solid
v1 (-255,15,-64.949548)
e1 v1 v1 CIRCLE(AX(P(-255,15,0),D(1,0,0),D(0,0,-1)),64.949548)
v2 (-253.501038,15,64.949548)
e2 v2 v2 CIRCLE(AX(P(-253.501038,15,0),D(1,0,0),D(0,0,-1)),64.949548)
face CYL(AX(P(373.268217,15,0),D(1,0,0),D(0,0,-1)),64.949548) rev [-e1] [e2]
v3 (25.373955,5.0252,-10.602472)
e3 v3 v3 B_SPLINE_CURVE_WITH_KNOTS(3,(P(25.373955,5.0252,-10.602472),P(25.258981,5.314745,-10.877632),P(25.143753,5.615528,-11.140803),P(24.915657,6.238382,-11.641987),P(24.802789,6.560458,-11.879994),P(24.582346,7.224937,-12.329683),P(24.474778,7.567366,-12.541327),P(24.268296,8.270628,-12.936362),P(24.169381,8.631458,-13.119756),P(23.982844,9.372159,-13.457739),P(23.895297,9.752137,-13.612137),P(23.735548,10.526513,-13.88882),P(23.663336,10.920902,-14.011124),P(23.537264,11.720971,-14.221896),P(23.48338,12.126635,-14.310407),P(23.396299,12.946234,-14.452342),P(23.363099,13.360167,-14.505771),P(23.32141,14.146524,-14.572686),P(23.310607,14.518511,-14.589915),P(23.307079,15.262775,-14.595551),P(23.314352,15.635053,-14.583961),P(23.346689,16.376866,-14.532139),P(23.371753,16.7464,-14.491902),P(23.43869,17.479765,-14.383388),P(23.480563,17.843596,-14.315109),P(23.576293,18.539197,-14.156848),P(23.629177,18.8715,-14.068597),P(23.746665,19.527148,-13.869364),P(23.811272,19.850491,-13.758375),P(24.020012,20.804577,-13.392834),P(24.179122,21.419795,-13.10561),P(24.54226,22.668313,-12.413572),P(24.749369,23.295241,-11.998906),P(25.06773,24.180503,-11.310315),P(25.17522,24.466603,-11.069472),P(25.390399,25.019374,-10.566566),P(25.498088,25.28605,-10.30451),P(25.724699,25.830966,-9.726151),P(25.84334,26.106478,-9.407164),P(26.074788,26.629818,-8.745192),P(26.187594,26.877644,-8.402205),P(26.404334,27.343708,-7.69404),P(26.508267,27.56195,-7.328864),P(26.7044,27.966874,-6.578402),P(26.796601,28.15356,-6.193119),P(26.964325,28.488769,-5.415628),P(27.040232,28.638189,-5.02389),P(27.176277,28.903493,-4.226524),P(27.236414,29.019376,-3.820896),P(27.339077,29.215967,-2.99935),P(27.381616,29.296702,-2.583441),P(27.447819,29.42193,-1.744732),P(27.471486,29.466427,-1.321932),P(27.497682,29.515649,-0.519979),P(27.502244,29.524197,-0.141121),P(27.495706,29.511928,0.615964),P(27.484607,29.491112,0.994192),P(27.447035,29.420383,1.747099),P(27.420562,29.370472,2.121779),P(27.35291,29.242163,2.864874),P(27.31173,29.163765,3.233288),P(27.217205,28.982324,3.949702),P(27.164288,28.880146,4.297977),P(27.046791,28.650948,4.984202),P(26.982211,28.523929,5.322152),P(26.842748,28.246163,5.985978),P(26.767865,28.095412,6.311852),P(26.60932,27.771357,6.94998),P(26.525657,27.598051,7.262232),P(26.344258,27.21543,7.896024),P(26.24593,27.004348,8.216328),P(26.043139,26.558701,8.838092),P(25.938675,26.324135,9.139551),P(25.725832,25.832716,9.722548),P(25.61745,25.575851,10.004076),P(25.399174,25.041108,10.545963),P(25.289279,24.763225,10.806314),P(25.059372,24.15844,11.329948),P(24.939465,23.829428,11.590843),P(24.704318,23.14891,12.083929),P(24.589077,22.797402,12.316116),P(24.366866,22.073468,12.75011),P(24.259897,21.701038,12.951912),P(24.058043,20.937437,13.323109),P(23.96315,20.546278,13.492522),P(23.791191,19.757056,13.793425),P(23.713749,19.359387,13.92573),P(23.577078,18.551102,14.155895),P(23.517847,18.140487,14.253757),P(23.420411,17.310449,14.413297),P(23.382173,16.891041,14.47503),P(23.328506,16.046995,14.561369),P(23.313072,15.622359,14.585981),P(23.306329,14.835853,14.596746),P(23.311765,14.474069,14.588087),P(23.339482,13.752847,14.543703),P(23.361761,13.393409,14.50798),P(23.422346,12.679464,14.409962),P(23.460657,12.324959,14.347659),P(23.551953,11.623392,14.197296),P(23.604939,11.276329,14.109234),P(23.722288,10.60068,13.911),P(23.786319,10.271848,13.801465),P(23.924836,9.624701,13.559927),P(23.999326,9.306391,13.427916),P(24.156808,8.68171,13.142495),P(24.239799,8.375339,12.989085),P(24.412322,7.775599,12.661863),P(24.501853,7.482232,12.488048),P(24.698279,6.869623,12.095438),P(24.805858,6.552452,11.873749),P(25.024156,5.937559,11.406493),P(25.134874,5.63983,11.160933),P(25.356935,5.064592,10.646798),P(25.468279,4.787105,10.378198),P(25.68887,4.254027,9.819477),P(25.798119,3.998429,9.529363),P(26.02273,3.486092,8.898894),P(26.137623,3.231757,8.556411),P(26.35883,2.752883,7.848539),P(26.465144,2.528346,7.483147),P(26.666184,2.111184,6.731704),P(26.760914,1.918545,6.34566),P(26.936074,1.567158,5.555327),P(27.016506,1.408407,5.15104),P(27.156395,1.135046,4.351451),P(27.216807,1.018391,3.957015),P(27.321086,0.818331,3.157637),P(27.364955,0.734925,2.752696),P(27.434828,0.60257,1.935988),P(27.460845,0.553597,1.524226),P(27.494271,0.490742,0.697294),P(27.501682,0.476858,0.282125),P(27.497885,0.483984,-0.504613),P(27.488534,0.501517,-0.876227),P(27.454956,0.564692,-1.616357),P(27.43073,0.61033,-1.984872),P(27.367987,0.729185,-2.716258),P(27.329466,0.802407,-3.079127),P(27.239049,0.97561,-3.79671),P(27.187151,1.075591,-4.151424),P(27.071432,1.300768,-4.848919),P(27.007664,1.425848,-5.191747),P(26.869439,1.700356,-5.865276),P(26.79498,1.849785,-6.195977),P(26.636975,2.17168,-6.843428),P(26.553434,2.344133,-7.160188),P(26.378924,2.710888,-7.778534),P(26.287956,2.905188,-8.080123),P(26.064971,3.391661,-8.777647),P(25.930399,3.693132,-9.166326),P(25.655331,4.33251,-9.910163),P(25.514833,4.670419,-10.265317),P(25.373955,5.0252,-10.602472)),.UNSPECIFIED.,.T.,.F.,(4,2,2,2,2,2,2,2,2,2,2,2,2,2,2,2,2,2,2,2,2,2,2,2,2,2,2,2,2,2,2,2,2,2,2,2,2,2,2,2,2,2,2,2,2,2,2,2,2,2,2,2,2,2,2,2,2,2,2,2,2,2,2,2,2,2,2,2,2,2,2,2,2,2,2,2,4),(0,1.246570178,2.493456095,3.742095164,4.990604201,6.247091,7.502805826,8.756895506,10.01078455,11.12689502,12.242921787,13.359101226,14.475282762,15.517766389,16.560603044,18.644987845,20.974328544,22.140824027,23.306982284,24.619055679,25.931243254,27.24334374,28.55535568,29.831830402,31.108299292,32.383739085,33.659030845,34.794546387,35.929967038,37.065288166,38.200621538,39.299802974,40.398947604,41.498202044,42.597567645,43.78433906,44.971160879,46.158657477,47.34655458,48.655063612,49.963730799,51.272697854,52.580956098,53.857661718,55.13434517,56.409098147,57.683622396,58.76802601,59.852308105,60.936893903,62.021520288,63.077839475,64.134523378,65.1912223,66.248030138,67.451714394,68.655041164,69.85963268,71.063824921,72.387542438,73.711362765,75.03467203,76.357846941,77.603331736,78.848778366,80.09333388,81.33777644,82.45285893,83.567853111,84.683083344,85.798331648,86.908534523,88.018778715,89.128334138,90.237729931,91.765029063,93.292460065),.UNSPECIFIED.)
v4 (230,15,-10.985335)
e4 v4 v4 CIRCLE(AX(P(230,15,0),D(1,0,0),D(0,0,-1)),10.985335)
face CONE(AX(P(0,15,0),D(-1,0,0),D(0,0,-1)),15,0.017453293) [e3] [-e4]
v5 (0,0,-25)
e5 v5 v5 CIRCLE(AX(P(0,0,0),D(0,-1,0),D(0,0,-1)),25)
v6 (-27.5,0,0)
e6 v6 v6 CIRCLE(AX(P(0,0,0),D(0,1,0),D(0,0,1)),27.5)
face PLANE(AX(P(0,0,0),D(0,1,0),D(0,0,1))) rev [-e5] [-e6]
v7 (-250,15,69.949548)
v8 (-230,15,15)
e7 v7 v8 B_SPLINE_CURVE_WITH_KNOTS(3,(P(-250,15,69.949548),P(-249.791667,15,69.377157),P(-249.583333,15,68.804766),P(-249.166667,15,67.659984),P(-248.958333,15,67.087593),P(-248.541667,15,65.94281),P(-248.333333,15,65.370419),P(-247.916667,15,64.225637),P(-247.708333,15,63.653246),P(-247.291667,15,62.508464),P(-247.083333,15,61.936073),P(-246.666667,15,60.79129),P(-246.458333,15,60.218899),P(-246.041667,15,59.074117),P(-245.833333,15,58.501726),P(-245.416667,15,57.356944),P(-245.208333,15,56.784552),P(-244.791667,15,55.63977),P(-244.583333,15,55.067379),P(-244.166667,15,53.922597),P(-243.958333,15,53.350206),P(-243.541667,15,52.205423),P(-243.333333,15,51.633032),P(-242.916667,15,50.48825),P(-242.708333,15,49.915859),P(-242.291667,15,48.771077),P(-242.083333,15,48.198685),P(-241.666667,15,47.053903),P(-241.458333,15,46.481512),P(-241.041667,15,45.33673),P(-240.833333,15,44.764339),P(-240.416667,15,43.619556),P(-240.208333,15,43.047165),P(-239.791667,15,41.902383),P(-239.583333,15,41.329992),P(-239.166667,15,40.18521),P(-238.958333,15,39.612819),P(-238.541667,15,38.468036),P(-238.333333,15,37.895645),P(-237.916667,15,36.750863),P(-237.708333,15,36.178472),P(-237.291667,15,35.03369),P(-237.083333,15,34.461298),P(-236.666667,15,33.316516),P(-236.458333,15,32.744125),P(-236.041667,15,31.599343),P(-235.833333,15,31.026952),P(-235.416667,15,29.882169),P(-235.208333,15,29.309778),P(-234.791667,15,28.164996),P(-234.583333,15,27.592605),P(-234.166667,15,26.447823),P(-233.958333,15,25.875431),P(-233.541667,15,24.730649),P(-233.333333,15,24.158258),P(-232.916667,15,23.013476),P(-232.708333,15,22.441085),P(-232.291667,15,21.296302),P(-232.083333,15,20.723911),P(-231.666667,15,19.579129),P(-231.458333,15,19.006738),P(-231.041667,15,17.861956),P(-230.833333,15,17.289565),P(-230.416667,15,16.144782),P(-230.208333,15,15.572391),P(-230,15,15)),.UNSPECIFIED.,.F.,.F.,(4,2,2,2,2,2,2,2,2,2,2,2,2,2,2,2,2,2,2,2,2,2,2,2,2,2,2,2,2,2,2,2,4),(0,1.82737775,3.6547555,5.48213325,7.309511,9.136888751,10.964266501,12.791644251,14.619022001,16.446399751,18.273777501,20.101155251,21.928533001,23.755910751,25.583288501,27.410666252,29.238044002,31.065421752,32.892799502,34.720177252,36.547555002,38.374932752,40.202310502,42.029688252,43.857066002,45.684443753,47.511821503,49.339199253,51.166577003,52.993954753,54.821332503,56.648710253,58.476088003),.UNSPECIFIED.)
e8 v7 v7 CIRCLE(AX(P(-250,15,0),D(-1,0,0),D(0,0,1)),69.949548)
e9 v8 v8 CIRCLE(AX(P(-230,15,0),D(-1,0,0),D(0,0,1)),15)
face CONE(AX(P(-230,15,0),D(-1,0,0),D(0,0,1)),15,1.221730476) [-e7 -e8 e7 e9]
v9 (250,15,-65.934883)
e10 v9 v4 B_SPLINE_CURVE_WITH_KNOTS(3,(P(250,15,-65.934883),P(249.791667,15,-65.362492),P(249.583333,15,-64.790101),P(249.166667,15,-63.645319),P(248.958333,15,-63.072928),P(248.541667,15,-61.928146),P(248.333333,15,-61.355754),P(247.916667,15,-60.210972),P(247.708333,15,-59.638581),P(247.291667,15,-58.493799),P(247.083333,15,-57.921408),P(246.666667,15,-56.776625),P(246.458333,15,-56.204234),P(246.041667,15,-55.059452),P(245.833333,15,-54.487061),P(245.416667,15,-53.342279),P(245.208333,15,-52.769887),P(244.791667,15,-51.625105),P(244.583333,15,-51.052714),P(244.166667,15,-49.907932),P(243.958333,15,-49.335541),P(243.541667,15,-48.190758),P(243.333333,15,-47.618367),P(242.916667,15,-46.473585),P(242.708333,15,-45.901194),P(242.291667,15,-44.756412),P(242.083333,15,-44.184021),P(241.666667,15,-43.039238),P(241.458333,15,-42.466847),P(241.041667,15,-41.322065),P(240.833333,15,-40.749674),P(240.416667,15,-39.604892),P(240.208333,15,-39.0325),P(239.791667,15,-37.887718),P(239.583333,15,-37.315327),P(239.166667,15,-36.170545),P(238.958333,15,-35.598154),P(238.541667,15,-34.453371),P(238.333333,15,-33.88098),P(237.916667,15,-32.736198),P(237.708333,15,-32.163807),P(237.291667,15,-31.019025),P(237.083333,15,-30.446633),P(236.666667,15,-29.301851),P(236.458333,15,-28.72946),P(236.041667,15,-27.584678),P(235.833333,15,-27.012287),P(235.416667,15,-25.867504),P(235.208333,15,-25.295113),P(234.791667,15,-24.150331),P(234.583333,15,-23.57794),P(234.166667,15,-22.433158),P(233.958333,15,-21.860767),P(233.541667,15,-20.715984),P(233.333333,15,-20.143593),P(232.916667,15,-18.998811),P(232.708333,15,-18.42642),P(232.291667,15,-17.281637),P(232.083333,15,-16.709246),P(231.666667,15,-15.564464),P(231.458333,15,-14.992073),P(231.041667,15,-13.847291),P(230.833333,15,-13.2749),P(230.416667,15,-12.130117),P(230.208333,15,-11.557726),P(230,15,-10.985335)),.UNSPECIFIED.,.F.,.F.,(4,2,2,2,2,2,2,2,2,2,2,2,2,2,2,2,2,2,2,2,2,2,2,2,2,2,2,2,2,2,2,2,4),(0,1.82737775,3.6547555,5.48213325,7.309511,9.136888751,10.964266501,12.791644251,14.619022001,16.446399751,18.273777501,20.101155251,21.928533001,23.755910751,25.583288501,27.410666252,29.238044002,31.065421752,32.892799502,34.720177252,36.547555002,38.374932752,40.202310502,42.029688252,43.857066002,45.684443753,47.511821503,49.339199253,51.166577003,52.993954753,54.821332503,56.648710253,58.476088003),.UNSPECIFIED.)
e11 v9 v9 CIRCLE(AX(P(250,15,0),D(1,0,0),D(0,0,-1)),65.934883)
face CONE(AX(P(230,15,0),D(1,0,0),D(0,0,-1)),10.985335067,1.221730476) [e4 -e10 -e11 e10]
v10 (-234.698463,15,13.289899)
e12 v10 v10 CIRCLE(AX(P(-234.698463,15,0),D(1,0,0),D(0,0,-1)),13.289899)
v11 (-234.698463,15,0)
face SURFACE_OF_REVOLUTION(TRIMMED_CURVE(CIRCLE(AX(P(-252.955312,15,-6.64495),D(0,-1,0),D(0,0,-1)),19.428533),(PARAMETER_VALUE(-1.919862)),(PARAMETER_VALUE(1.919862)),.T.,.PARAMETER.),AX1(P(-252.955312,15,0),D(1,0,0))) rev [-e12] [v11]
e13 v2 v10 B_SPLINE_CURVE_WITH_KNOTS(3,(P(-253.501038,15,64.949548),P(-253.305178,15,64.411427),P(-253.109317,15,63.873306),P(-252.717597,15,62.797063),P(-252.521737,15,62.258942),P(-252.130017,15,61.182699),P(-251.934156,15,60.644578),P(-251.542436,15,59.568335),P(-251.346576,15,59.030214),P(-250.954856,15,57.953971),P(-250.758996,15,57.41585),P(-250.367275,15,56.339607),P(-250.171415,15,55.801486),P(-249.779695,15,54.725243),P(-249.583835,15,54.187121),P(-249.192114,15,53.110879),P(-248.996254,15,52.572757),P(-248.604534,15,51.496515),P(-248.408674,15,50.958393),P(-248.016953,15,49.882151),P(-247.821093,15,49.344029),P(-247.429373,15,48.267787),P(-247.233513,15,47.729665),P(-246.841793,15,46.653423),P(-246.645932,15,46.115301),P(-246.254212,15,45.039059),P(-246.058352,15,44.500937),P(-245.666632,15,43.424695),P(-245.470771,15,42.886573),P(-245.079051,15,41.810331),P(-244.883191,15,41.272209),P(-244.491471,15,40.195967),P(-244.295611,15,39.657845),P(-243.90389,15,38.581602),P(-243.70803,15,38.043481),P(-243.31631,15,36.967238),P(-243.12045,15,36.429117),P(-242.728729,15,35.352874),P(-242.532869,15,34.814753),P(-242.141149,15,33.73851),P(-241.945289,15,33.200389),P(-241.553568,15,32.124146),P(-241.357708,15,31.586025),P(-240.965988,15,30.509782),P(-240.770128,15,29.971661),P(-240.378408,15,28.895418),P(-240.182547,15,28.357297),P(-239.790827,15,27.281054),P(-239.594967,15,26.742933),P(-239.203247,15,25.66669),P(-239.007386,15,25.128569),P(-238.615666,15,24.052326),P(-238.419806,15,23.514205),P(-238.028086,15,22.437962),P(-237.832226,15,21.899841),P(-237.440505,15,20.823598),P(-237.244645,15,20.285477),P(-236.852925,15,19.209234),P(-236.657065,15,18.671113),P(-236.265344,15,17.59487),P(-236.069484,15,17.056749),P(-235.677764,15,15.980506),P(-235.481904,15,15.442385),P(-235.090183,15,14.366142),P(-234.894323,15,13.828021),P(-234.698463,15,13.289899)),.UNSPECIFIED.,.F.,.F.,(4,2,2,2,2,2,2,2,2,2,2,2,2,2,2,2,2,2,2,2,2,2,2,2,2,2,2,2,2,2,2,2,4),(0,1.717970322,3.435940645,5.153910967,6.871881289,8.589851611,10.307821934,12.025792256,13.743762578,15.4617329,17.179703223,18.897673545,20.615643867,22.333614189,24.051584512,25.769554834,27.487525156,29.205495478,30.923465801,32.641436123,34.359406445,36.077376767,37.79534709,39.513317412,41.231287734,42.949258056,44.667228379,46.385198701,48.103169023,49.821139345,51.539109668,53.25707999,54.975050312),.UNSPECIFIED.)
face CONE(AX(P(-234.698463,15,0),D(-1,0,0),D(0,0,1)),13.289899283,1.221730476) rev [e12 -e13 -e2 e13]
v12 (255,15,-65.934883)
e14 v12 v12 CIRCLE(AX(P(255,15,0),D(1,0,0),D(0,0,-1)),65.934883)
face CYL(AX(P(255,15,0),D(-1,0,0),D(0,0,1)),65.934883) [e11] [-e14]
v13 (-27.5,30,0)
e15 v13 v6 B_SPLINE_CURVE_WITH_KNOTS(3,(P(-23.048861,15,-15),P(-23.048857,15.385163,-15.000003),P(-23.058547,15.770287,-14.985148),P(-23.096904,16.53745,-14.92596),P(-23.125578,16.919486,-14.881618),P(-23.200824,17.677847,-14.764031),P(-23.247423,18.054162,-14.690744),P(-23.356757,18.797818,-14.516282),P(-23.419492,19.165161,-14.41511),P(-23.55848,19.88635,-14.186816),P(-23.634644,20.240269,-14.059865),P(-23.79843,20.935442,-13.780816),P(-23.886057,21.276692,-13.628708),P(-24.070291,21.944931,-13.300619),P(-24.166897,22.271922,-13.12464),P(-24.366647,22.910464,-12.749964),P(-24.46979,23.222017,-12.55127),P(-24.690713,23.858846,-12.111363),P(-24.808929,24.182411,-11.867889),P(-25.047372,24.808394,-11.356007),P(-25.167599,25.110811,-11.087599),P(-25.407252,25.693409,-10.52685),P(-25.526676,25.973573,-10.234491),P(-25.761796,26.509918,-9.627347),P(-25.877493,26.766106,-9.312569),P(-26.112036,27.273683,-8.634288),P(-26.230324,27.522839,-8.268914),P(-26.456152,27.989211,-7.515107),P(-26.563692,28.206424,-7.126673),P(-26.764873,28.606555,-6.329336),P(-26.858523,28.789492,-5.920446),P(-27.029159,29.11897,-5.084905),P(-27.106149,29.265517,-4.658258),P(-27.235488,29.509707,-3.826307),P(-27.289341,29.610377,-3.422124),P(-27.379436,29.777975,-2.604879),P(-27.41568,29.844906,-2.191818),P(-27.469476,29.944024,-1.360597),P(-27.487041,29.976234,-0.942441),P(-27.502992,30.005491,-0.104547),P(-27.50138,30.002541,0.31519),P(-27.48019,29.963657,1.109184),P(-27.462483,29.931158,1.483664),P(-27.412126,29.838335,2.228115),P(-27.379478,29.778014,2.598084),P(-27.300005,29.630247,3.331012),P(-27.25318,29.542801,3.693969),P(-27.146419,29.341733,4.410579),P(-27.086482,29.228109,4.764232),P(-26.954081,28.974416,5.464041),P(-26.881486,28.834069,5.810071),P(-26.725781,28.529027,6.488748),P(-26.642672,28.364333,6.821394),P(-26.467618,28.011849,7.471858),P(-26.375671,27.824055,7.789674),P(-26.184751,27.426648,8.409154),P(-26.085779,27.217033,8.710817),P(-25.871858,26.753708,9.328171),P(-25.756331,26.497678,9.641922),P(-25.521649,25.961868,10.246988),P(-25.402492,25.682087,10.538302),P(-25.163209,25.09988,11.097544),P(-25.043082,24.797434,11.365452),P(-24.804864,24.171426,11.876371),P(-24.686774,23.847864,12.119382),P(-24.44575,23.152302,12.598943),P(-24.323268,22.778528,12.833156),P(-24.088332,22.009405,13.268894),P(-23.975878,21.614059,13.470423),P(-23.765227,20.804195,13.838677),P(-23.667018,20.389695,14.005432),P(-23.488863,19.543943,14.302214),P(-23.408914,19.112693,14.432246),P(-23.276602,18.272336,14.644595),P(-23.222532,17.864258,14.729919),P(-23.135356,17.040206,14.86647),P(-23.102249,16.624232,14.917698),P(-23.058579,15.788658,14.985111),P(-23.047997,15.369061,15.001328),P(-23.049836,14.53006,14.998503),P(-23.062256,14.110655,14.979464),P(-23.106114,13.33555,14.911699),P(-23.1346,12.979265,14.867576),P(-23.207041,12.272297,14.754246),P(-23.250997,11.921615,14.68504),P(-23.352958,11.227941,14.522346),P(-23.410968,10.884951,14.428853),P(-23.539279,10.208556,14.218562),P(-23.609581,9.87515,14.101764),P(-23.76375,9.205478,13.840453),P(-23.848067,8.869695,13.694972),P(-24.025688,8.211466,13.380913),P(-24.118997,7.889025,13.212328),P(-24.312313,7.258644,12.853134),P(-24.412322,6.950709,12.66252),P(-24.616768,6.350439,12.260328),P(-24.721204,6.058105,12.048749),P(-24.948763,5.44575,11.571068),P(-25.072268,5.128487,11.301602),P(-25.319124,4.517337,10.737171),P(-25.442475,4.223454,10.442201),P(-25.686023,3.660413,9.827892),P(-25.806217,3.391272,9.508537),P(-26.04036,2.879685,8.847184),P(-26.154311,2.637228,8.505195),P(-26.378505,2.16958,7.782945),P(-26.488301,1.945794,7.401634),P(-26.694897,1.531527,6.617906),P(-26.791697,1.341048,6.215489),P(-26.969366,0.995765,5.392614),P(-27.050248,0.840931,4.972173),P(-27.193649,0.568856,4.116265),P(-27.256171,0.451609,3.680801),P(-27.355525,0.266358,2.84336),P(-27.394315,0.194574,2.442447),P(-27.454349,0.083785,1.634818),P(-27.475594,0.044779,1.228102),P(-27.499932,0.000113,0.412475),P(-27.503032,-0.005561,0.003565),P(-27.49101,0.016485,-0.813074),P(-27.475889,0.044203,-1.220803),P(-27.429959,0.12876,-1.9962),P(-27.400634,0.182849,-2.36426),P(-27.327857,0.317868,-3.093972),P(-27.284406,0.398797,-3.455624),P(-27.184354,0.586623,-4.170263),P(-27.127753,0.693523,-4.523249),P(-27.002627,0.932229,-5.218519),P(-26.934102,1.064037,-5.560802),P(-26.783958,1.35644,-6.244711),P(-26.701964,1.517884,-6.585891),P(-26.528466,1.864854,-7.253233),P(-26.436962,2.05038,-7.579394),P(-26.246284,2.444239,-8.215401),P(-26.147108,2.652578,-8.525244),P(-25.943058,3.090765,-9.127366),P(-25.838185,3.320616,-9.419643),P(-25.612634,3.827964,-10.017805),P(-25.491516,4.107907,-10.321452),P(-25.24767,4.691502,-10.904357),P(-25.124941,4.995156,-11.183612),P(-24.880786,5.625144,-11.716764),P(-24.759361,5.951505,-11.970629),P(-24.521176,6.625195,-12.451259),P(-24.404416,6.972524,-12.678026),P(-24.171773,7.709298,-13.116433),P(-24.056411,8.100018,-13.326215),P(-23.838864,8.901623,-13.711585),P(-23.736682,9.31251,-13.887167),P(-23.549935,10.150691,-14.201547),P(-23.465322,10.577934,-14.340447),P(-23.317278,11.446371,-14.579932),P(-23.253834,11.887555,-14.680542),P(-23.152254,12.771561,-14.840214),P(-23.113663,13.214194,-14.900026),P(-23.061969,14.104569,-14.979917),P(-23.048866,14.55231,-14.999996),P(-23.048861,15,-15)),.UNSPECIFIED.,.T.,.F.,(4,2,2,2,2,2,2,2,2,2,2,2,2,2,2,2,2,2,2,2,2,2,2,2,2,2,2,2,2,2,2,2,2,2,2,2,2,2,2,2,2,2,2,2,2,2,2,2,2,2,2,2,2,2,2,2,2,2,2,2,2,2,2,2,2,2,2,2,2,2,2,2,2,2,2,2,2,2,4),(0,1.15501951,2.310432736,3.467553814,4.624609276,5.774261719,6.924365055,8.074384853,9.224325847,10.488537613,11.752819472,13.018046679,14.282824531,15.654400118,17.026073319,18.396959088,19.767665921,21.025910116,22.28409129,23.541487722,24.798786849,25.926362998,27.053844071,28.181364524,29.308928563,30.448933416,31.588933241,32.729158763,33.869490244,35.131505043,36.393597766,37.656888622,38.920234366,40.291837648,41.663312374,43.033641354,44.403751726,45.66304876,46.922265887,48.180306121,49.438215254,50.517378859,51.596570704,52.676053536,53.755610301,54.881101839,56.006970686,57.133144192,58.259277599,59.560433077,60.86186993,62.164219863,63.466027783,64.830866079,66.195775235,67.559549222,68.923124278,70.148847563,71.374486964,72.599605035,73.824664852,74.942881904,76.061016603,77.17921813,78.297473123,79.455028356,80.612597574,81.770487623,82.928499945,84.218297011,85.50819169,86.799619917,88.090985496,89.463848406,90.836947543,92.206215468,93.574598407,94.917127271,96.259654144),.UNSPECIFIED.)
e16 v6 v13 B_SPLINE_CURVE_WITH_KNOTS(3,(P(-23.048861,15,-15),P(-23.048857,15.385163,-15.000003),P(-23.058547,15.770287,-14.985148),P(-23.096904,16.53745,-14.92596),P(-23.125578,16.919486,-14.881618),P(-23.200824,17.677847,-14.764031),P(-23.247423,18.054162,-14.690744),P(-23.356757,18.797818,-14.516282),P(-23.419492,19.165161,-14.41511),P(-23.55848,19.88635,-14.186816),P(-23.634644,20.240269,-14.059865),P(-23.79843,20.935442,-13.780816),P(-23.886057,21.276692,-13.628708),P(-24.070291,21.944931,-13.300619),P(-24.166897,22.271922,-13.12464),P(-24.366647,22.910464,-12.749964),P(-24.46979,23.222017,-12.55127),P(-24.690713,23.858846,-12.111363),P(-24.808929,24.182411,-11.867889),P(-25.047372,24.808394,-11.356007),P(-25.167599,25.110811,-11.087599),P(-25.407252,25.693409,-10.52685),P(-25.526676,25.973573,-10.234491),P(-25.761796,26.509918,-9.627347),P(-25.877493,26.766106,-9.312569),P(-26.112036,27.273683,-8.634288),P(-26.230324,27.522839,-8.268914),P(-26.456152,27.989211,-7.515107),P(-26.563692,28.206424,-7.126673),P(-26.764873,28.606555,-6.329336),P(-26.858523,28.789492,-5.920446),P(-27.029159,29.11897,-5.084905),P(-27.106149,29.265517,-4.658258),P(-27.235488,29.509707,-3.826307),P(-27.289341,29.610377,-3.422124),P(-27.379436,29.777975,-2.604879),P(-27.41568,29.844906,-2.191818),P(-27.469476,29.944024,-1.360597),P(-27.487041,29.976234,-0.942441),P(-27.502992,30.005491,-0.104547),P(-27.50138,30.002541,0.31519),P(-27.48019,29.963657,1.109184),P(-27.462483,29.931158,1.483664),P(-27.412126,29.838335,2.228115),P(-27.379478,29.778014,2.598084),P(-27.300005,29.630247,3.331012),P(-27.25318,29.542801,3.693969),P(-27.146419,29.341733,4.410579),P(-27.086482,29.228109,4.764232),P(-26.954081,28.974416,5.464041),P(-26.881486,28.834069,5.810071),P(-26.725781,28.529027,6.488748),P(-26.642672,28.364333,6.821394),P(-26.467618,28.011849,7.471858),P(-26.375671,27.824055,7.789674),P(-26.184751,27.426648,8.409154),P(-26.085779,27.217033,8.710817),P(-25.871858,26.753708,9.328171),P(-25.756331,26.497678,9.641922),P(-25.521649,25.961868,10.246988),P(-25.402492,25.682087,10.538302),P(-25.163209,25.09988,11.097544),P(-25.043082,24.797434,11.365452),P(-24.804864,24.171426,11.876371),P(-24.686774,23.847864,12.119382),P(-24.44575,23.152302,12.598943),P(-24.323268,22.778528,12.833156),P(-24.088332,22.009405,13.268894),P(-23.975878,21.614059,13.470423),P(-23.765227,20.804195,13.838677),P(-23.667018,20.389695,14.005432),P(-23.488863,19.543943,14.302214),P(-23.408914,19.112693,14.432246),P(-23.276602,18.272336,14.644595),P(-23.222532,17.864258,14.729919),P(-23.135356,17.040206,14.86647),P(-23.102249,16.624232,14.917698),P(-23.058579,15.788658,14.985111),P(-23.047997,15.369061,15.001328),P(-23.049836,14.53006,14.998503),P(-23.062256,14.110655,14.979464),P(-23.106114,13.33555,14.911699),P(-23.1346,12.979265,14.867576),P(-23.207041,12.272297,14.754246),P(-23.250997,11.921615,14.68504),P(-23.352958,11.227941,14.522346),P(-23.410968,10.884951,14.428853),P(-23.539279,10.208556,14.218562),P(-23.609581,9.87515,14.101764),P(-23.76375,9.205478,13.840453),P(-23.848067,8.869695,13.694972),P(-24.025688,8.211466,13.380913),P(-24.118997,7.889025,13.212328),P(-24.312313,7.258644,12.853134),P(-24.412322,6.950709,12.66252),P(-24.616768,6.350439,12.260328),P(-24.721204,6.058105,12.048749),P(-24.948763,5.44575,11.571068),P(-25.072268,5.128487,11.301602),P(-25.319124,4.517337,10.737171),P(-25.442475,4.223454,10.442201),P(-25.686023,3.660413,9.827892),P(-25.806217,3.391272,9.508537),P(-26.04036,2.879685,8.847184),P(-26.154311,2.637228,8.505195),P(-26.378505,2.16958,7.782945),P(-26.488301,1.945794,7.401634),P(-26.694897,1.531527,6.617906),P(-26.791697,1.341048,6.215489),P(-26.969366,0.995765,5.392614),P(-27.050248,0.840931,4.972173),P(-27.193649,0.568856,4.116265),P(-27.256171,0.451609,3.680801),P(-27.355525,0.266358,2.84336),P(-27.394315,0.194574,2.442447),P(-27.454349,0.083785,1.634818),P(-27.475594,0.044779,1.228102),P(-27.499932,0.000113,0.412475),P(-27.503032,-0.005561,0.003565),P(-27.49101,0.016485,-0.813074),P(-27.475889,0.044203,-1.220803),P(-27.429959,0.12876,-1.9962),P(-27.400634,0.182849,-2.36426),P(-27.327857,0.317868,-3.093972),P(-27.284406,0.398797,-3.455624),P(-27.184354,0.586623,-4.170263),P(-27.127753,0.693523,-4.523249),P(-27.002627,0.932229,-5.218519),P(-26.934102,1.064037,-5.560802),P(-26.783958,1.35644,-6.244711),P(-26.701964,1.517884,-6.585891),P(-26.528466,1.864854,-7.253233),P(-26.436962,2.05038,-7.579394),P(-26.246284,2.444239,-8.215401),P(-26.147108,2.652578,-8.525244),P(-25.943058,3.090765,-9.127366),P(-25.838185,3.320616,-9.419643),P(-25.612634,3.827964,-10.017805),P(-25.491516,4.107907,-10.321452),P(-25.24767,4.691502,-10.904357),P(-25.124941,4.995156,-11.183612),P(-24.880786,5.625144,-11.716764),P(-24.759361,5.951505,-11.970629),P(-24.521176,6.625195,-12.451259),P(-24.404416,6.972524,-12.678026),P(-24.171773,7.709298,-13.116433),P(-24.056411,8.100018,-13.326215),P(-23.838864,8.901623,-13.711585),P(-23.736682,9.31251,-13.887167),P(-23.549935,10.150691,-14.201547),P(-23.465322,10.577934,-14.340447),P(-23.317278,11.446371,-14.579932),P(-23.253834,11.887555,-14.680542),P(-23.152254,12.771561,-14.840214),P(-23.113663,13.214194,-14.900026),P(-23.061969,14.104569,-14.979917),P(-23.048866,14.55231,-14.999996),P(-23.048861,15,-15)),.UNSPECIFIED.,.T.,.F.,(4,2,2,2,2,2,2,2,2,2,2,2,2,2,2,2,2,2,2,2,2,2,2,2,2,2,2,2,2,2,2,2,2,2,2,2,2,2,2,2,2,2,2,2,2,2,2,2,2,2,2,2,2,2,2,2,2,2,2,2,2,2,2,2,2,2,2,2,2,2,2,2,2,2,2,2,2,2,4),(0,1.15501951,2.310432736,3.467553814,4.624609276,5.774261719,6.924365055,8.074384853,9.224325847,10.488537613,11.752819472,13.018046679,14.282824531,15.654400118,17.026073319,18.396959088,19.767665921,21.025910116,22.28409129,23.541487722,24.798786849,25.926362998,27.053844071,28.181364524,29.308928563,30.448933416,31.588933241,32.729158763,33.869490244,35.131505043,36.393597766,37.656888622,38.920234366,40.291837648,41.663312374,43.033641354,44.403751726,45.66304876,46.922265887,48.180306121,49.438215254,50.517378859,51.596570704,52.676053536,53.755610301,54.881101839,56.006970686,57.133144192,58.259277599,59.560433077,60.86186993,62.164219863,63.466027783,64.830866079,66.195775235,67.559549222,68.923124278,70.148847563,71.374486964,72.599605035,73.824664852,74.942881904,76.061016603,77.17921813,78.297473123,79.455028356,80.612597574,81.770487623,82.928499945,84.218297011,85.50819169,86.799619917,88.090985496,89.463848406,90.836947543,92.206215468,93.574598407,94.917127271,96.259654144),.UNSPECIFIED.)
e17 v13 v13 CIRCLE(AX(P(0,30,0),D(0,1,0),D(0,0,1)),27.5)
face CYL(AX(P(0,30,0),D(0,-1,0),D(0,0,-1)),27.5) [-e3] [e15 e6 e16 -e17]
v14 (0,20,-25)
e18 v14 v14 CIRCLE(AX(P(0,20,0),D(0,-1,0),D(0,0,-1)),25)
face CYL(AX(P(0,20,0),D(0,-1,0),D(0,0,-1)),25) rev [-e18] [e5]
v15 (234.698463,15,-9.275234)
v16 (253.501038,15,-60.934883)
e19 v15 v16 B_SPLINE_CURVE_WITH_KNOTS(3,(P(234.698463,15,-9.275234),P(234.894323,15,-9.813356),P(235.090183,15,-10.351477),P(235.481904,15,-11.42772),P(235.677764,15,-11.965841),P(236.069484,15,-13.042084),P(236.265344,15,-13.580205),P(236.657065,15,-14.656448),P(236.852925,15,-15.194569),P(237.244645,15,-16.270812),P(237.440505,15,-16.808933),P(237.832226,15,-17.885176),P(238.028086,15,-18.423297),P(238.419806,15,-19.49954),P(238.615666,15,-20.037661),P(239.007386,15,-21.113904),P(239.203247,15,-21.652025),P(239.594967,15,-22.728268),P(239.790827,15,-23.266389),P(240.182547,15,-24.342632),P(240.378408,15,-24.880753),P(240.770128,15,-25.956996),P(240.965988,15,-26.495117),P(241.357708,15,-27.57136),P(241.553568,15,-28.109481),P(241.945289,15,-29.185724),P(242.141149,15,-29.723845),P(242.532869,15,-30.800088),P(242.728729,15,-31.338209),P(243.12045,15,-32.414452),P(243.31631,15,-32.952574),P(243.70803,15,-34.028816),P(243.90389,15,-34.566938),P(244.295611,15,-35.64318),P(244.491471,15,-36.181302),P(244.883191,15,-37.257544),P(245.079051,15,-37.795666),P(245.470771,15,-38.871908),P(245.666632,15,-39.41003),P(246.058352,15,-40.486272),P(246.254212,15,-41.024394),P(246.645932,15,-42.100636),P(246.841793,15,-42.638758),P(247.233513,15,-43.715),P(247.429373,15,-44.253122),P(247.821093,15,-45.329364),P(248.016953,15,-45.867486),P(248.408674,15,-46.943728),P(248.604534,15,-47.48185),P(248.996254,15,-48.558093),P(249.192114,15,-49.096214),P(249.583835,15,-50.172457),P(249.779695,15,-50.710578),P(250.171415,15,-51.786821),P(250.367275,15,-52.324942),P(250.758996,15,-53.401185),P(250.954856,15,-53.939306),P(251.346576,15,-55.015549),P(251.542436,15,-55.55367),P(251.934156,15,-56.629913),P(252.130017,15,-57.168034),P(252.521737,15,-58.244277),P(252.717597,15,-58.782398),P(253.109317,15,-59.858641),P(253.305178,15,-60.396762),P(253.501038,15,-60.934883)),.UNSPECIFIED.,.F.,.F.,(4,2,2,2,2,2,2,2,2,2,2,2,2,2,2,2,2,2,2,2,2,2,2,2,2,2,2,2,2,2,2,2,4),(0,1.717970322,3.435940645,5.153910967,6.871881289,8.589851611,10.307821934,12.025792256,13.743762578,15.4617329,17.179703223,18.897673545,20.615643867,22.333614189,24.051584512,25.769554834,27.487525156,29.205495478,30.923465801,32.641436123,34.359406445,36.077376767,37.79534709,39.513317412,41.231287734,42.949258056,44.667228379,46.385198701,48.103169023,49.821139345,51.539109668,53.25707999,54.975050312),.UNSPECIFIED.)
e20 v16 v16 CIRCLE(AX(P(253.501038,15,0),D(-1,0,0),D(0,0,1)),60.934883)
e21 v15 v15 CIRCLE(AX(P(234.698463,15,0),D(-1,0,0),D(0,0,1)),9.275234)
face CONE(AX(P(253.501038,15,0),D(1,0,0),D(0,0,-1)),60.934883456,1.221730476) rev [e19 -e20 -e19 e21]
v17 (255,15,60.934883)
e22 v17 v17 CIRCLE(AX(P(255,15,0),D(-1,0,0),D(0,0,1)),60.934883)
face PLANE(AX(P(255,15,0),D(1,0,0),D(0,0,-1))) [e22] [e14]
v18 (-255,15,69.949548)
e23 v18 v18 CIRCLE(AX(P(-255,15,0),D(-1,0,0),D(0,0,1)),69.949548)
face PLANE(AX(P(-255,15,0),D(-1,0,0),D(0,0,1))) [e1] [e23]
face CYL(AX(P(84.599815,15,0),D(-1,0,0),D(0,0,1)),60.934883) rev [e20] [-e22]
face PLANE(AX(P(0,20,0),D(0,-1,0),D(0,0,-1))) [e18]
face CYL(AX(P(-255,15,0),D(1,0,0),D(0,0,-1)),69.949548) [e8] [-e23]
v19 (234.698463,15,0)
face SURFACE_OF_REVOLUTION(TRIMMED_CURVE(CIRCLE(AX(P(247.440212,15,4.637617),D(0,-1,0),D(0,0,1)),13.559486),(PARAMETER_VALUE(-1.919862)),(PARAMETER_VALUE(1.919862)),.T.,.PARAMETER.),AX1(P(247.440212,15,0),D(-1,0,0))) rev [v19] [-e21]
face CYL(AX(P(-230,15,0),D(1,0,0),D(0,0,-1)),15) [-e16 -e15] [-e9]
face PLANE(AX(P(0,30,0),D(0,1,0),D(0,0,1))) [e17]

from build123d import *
from build123d.topology import SkipClean

# Parameters (mm, degrees)
SKETCH1_R                     = 27.5
BOSS_EXTRUDE1_DEPTH           = 30
SKETCH4_R                     = 15
BOSS_EXTRUDE3_DEPTH           = 230
BOSS_EXTRUDE3_TAPER           = 1
BOSS_EXTRUDE3_OTHER_WAY_DEPTH = 230
SKETCH2_R                     = 25
CUT_EXTRUDE4_DEPTH            = 20
SKETCH10_R                    = 65.934883456
BOSS_EXTRUDE7_DEPTH           = 5
SKETCH11_R                    = 69.949548389
BOSS_EXTRUDE8_DEPTH           = 5


# Read off the part's stored shape, not the designer's step: Boss-Extrude4, Boss-Extrude5
with BuildPart() as part:
    # Sketch1 → Boss-Extrude1 (new body)
    with BuildSketch(Plane(origin=(0, 0, 0), x_dir=(1, 0, 0), z_dir=(0, 1, 0))):
        with Locations(Location((0, 0, 0), (0, 0, 270))):
            Circle(SKETCH1_R)
    extrude(amount=BOSS_EXTRUDE1_DEPTH)

    # Sketch4 → Boss-Extrude3 (add)
    with BuildSketch(Plane(origin=(0, 0, 0), x_dir=(0, 0, -1), z_dir=(1, 0, 0))):
        with Locations((0, 15)):
            Circle(SKETCH4_R)
    extrude(amount=BOSS_EXTRUDE3_DEPTH, taper=BOSS_EXTRUDE3_TAPER)

    # Sketch4 → Boss-Extrude3 other way (add)
    with SkipClean():  # the faces are left unmerged after this step: merging them gives an invalid solid
        with BuildSketch(Plane(origin=(0, 0, 0), x_dir=(0, 0, -1), z_dir=(1, 0, 0))):
            with Locations((0, 15)):
                Circle(SKETCH4_R)
        extrude(amount=-BOSS_EXTRUDE3_OTHER_WAY_DEPTH)

    # Sketch2 → Cut-Extrude4 (cut)
    with SkipClean():  # the faces are left unmerged after this step: merging them gives an invalid solid
        with BuildSketch(Plane.XZ):
            with Locations(Location((0, 0, 0), (0, 0, 270))):
                Circle(SKETCH2_R)
        extrude(amount=-CUT_EXTRUDE4_DEPTH, mode=Mode.SUBTRACT)

    # Boss-Extrude4 outline → Boss-Extrude4 (revolve)
    with SkipClean():  # the faces are left unmerged after this step: merging them gives an invalid solid
        with BuildSketch(Plane(origin=(0, 15, 0), x_dir=(0, 1, 0), z_dir=(0, 0, -1))):
            Polygon((0, 230), (10.985335067, 230), (65.934883456, 250), (0, 250), align=None)
        revolve(axis=Axis((0, 15, 0), (1, 0, 0)))

    # Boss-Extrude5 outline → Boss-Extrude5 (revolve)
    with SkipClean():  # the faces are left unmerged after this step: merging them gives an invalid solid
        with BuildSketch(Plane(origin=(0, 15, 0), x_dir=(0, 1, 0), z_dir=(0, 0, -1))):
            Polygon((69.949548389, -250), (15, -230), (0, -230), (0, -250), align=None)
        revolve(axis=Axis((0, 15, 0), (1, 0, 0)))

    # Sketch10 → Boss-Extrude7 (add)
    with SkipClean():  # the faces are left unmerged after this step: merging them gives an invalid solid
        with BuildSketch(Plane(origin=(250, 0, 0), x_dir=(0, 0, -1), z_dir=(1, 0, 0))):
            with Locations((0, 15)):
                Circle(SKETCH10_R)
        extrude(amount=BOSS_EXTRUDE7_DEPTH)

    # Sketch11 → Boss-Extrude8 (add)
    with SkipClean():  # the faces are left unmerged after this step: merging them gives an invalid solid
        with BuildSketch(Plane.ZY.offset(250)):
            with Locations((0, 15)):
                Circle(SKETCH11_R)
        extrude(amount=BOSS_EXTRUDE8_DEPTH)

    # Sketch12 → Cut-Revolve3 (revolve, cut)
    with SkipClean():  # the faces are left unmerged after this step: merging them gives an invalid solid
        with BuildSketch(Plane(origin=(0, 15, 0), x_dir=(1, 0, 0), z_dir=(0, 1, 0)), mode=Mode.PRIVATE) as cut_revolve3_sk:
            with BuildLine():
                Line((-234.698463104, 13.289899283), (-253.501037691, 64.949548389))
                Line((-253.501037691, 64.949548389), (-255, 64.949548389))
                Line((-255, 64.949548389), (-255, 0))
                Line((-255, 0), (-234.698463104, 0))
                ThreePointArc((-234.698463104, 0), (-233.526779197, 6.644949642), (-234.698463104, 13.289899283))
            make_face()
        revolve(cut_revolve3_sk.sketch.rotate(Axis((373.268217057, 15, 0), (-1, 0, 0)), 270), axis=Axis((373.268217057, 15, 0), (-1, 0, 0)), mode=Mode.SUBTRACT)

    # Sketch14 → Cut-Revolve4 (revolve, cut)
    with SkipClean():  # the faces are left unmerged after this step: merging them gives an invalid solid
        with BuildSketch(Plane(origin=(0, 15, 0), x_dir=(1, 0, 0), z_dir=(0, 1, 0)), mode=Mode.PRIVATE) as cut_revolve4_sk:
            with BuildLine():
                Line((255, 60.934883456), (253.501037691, 60.934883456))
                Line((253.501037691, 60.934883456), (234.698463104, 9.27523435))
                ThreePointArc((234.698463104, 9.27523435), (233.88072607, 4.637617175), (234.698463104, 0))
                Line((234.698463104, 0), (255, 0))
                Line((255, 0), (255, 60.934883456))
            make_face()
        revolve(cut_revolve4_sk.sketch.rotate(Axis((84.599815478, 15, 0), (1, 0, 0)), 90), axis=Axis((84.599815478, 15, 0), (1, 0, 0)), mode=Mode.SUBTRACT)


solid = part.part
